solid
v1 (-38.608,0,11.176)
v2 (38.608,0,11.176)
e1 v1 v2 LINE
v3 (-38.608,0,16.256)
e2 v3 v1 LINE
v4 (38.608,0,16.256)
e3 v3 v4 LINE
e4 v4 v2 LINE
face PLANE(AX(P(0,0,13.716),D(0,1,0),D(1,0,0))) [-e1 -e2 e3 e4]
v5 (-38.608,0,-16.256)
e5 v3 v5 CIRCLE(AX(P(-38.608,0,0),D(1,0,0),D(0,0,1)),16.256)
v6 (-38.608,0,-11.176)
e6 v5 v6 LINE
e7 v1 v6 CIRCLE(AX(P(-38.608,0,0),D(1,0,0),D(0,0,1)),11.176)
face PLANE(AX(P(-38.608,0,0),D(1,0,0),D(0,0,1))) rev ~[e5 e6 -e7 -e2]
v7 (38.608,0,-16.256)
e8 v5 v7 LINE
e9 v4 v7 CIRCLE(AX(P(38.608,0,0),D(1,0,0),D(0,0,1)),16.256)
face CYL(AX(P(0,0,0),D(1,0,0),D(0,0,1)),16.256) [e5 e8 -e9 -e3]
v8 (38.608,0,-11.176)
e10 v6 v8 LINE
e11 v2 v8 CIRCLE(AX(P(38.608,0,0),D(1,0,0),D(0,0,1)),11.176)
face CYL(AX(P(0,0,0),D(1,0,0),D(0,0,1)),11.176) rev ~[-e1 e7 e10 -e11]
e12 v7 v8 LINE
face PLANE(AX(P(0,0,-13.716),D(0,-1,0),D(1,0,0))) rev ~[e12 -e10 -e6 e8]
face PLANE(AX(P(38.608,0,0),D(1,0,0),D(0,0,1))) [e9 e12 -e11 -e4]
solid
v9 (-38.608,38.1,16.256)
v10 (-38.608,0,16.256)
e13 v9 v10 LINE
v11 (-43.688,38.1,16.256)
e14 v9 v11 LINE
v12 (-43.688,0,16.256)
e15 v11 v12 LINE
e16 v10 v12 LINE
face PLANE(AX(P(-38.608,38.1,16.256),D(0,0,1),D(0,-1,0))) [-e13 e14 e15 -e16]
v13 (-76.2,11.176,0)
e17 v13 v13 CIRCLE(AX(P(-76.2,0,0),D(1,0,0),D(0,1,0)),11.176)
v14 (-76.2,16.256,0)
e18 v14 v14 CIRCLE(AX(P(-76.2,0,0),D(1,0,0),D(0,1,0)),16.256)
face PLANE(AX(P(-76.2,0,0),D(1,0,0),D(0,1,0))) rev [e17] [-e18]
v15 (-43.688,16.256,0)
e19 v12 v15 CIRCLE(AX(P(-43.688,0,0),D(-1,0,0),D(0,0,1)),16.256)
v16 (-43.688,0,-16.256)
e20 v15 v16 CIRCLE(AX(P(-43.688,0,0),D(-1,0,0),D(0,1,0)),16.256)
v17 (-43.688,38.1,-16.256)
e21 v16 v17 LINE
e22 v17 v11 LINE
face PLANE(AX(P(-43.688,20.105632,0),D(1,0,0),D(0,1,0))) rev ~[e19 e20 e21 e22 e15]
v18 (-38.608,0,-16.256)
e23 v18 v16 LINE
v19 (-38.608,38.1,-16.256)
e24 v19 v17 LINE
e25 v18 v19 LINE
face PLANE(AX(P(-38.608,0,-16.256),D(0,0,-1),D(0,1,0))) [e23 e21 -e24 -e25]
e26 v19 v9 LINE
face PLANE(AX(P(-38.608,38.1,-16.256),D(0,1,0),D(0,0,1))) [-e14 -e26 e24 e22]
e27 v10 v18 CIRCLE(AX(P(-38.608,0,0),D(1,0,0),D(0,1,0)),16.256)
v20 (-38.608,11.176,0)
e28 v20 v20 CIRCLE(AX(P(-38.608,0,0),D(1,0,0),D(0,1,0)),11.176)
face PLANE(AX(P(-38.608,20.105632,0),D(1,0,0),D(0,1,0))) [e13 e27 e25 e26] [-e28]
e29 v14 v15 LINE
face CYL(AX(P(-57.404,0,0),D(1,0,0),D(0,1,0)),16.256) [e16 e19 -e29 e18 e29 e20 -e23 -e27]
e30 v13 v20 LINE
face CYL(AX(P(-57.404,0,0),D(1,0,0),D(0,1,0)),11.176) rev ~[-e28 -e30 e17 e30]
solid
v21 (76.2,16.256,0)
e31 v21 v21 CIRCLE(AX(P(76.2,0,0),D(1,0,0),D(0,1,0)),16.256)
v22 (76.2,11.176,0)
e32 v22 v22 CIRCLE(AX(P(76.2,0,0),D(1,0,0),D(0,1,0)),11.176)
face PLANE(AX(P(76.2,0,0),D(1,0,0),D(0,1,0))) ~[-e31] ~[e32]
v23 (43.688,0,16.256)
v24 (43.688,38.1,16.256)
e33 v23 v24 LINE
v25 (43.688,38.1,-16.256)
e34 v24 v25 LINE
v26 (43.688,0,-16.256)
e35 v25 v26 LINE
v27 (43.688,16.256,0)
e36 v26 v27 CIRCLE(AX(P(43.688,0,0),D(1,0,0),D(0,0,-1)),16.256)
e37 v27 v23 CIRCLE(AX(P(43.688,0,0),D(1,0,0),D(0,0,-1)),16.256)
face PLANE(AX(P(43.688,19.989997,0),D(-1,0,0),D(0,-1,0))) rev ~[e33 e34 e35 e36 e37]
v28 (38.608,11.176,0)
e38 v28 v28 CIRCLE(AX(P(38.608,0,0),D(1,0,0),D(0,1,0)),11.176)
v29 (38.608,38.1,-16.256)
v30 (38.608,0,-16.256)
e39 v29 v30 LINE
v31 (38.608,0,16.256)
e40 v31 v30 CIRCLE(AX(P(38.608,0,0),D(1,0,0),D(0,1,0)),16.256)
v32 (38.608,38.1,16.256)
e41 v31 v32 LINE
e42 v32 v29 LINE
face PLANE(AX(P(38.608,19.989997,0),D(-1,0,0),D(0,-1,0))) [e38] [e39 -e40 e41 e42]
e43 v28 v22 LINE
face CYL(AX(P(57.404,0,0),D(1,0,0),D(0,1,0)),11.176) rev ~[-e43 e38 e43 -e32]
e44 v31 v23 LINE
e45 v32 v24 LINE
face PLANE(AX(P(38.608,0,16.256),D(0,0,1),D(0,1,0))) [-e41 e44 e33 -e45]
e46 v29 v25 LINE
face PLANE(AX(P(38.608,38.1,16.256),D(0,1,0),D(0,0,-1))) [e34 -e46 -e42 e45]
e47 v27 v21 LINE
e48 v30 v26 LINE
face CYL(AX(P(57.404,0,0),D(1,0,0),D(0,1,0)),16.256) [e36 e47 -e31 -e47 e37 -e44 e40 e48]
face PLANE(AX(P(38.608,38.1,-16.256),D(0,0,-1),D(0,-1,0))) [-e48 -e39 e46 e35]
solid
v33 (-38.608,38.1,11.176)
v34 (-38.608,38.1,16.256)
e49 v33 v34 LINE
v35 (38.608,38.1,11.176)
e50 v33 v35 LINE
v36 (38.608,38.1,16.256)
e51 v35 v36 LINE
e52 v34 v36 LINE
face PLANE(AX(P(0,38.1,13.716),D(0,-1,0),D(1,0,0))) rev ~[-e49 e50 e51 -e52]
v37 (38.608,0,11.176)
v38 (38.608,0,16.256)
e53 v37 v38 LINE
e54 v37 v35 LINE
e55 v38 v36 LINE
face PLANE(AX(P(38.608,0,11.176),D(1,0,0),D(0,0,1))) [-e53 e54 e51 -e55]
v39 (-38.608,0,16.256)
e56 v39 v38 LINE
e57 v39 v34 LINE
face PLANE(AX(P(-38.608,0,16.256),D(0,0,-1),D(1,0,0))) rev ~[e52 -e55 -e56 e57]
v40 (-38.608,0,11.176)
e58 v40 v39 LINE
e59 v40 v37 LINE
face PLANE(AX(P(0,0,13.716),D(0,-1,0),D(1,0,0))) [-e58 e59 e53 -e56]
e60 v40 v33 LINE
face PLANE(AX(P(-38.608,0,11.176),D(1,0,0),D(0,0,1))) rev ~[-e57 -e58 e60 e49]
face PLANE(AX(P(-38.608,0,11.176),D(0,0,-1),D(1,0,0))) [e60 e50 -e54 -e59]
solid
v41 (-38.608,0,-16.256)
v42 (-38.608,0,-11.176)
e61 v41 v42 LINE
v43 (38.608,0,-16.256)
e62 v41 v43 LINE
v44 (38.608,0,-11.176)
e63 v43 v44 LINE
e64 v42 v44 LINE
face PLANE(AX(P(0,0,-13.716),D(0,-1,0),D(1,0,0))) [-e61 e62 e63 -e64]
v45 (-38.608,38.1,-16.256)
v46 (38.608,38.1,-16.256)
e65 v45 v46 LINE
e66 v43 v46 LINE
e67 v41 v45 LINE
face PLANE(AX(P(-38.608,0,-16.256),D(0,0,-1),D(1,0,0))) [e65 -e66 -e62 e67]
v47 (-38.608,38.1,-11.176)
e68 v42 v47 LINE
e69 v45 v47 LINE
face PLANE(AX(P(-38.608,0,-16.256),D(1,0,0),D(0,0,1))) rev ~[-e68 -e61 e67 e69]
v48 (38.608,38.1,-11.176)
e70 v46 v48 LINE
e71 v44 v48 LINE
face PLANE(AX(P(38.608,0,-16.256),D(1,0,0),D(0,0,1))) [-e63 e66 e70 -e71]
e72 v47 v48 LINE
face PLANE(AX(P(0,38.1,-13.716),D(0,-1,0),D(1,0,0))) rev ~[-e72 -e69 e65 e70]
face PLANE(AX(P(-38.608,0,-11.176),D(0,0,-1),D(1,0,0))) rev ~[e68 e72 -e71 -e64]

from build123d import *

# Parameters (mm, degrees)
F0_W          = 37.592
F0_H          = 5.08
F2_W          = 77.216
F2_H          = 5.08
F3_ANGLE_BACK = 90
F3_ANGLE      = 180
F4_W          = 77.216
F4_H          = 5.08
F5_DEPTH      = 38.1
F7_DEPTH      = 5.08
F9_DEPTH      = 5.08


with BuildPart() as f1:
    # F0 (on Top) → F1 (revolve)
    with BuildSketch(Plane.XY):
        with Locations((-57.404, 13.716)):
            Rectangle(F0_W, F0_H)
    revolve(axis=Axis((-4.8519736156, 0, 0), (1, 0, 0)))

    # F6 (on face) → F7 (join)
    with BuildSketch(Plane.YZ.offset(-38.608)):
        with BuildLine():
            Line((38.1, 16.256), (0, 16.256))
            ThreePointArc((0, 16.256), (11.494727835, 11.494727835), (16.256, 0))
            ThreePointArc((16.256, 0), (11.494727835, -11.494727835), (0, -16.256))
            Line((0, -16.256), (38.1, -16.256))
            Line((38.1, -16.256), (38.1, 16.256))
        make_face()
    extrude(amount=-F7_DEPTH)


with BuildPart() as f1b:
    # F0 (on Top) → F1, piece 2 (revolve)
    with BuildSketch(Plane.XY):
        with Locations((57.404, 13.716)):
            Rectangle(F0_W, F0_H)
    revolve(axis=Axis((-4.8519736156, 0, 0), (1, 0, 0)))

    # F8 (on face) → F9 (join)
    with BuildSketch(Plane(origin=(38.608, 0, 0), x_dir=(0, -1, 0), z_dir=(-1, 0, 0))):
        with BuildLine():
            ThreePointArc((0, -16.256), (-16.256, 0), (0, 16.256))
            Line((0, 16.256), (-38.1, 16.256))
            Line((-38.1, 16.256), (-38.1, -16.256))
            Line((-38.1, -16.256), (0, -16.256))
        make_face()
    extrude(amount=-F9_DEPTH)


with BuildPart() as f3:
    # F2 (on Top) → F3 (revolve)
    with BuildSketch(Plane.XY, mode=Mode.PRIVATE) as f3_sk:
        with Locations((0, -13.716)):
            Rectangle(F2_W, F2_H)
    revolve(f3_sk.sketch.rotate(Axis((-9.3715274706, 0, 0), (1, 0, 0)), -F3_ANGLE_BACK), axis=Axis((-9.3715274706, 0, 0), (1, 0, 0)), revolution_arc=F3_ANGLE)


with BuildPart() as f5:
    # F4 (on Front) → F5 (new body)
    with BuildSketch(Plane.XZ):
        with Locations((0, 13.716)):
            Rectangle(F4_W, F4_H)
    extrude(amount=-F5_DEPTH)


with BuildPart() as f5b:
    # F4 (on Front) → F5, piece 2 (new body)
    with BuildSketch(Plane.XZ):
        with Locations((0, -13.716)):
            Rectangle(F4_W, F4_H)
    extrude(amount=-F5_DEPTH)


solid = Compound([f1.part, f1b.part, f3.part, f5.part, f5b.part])
